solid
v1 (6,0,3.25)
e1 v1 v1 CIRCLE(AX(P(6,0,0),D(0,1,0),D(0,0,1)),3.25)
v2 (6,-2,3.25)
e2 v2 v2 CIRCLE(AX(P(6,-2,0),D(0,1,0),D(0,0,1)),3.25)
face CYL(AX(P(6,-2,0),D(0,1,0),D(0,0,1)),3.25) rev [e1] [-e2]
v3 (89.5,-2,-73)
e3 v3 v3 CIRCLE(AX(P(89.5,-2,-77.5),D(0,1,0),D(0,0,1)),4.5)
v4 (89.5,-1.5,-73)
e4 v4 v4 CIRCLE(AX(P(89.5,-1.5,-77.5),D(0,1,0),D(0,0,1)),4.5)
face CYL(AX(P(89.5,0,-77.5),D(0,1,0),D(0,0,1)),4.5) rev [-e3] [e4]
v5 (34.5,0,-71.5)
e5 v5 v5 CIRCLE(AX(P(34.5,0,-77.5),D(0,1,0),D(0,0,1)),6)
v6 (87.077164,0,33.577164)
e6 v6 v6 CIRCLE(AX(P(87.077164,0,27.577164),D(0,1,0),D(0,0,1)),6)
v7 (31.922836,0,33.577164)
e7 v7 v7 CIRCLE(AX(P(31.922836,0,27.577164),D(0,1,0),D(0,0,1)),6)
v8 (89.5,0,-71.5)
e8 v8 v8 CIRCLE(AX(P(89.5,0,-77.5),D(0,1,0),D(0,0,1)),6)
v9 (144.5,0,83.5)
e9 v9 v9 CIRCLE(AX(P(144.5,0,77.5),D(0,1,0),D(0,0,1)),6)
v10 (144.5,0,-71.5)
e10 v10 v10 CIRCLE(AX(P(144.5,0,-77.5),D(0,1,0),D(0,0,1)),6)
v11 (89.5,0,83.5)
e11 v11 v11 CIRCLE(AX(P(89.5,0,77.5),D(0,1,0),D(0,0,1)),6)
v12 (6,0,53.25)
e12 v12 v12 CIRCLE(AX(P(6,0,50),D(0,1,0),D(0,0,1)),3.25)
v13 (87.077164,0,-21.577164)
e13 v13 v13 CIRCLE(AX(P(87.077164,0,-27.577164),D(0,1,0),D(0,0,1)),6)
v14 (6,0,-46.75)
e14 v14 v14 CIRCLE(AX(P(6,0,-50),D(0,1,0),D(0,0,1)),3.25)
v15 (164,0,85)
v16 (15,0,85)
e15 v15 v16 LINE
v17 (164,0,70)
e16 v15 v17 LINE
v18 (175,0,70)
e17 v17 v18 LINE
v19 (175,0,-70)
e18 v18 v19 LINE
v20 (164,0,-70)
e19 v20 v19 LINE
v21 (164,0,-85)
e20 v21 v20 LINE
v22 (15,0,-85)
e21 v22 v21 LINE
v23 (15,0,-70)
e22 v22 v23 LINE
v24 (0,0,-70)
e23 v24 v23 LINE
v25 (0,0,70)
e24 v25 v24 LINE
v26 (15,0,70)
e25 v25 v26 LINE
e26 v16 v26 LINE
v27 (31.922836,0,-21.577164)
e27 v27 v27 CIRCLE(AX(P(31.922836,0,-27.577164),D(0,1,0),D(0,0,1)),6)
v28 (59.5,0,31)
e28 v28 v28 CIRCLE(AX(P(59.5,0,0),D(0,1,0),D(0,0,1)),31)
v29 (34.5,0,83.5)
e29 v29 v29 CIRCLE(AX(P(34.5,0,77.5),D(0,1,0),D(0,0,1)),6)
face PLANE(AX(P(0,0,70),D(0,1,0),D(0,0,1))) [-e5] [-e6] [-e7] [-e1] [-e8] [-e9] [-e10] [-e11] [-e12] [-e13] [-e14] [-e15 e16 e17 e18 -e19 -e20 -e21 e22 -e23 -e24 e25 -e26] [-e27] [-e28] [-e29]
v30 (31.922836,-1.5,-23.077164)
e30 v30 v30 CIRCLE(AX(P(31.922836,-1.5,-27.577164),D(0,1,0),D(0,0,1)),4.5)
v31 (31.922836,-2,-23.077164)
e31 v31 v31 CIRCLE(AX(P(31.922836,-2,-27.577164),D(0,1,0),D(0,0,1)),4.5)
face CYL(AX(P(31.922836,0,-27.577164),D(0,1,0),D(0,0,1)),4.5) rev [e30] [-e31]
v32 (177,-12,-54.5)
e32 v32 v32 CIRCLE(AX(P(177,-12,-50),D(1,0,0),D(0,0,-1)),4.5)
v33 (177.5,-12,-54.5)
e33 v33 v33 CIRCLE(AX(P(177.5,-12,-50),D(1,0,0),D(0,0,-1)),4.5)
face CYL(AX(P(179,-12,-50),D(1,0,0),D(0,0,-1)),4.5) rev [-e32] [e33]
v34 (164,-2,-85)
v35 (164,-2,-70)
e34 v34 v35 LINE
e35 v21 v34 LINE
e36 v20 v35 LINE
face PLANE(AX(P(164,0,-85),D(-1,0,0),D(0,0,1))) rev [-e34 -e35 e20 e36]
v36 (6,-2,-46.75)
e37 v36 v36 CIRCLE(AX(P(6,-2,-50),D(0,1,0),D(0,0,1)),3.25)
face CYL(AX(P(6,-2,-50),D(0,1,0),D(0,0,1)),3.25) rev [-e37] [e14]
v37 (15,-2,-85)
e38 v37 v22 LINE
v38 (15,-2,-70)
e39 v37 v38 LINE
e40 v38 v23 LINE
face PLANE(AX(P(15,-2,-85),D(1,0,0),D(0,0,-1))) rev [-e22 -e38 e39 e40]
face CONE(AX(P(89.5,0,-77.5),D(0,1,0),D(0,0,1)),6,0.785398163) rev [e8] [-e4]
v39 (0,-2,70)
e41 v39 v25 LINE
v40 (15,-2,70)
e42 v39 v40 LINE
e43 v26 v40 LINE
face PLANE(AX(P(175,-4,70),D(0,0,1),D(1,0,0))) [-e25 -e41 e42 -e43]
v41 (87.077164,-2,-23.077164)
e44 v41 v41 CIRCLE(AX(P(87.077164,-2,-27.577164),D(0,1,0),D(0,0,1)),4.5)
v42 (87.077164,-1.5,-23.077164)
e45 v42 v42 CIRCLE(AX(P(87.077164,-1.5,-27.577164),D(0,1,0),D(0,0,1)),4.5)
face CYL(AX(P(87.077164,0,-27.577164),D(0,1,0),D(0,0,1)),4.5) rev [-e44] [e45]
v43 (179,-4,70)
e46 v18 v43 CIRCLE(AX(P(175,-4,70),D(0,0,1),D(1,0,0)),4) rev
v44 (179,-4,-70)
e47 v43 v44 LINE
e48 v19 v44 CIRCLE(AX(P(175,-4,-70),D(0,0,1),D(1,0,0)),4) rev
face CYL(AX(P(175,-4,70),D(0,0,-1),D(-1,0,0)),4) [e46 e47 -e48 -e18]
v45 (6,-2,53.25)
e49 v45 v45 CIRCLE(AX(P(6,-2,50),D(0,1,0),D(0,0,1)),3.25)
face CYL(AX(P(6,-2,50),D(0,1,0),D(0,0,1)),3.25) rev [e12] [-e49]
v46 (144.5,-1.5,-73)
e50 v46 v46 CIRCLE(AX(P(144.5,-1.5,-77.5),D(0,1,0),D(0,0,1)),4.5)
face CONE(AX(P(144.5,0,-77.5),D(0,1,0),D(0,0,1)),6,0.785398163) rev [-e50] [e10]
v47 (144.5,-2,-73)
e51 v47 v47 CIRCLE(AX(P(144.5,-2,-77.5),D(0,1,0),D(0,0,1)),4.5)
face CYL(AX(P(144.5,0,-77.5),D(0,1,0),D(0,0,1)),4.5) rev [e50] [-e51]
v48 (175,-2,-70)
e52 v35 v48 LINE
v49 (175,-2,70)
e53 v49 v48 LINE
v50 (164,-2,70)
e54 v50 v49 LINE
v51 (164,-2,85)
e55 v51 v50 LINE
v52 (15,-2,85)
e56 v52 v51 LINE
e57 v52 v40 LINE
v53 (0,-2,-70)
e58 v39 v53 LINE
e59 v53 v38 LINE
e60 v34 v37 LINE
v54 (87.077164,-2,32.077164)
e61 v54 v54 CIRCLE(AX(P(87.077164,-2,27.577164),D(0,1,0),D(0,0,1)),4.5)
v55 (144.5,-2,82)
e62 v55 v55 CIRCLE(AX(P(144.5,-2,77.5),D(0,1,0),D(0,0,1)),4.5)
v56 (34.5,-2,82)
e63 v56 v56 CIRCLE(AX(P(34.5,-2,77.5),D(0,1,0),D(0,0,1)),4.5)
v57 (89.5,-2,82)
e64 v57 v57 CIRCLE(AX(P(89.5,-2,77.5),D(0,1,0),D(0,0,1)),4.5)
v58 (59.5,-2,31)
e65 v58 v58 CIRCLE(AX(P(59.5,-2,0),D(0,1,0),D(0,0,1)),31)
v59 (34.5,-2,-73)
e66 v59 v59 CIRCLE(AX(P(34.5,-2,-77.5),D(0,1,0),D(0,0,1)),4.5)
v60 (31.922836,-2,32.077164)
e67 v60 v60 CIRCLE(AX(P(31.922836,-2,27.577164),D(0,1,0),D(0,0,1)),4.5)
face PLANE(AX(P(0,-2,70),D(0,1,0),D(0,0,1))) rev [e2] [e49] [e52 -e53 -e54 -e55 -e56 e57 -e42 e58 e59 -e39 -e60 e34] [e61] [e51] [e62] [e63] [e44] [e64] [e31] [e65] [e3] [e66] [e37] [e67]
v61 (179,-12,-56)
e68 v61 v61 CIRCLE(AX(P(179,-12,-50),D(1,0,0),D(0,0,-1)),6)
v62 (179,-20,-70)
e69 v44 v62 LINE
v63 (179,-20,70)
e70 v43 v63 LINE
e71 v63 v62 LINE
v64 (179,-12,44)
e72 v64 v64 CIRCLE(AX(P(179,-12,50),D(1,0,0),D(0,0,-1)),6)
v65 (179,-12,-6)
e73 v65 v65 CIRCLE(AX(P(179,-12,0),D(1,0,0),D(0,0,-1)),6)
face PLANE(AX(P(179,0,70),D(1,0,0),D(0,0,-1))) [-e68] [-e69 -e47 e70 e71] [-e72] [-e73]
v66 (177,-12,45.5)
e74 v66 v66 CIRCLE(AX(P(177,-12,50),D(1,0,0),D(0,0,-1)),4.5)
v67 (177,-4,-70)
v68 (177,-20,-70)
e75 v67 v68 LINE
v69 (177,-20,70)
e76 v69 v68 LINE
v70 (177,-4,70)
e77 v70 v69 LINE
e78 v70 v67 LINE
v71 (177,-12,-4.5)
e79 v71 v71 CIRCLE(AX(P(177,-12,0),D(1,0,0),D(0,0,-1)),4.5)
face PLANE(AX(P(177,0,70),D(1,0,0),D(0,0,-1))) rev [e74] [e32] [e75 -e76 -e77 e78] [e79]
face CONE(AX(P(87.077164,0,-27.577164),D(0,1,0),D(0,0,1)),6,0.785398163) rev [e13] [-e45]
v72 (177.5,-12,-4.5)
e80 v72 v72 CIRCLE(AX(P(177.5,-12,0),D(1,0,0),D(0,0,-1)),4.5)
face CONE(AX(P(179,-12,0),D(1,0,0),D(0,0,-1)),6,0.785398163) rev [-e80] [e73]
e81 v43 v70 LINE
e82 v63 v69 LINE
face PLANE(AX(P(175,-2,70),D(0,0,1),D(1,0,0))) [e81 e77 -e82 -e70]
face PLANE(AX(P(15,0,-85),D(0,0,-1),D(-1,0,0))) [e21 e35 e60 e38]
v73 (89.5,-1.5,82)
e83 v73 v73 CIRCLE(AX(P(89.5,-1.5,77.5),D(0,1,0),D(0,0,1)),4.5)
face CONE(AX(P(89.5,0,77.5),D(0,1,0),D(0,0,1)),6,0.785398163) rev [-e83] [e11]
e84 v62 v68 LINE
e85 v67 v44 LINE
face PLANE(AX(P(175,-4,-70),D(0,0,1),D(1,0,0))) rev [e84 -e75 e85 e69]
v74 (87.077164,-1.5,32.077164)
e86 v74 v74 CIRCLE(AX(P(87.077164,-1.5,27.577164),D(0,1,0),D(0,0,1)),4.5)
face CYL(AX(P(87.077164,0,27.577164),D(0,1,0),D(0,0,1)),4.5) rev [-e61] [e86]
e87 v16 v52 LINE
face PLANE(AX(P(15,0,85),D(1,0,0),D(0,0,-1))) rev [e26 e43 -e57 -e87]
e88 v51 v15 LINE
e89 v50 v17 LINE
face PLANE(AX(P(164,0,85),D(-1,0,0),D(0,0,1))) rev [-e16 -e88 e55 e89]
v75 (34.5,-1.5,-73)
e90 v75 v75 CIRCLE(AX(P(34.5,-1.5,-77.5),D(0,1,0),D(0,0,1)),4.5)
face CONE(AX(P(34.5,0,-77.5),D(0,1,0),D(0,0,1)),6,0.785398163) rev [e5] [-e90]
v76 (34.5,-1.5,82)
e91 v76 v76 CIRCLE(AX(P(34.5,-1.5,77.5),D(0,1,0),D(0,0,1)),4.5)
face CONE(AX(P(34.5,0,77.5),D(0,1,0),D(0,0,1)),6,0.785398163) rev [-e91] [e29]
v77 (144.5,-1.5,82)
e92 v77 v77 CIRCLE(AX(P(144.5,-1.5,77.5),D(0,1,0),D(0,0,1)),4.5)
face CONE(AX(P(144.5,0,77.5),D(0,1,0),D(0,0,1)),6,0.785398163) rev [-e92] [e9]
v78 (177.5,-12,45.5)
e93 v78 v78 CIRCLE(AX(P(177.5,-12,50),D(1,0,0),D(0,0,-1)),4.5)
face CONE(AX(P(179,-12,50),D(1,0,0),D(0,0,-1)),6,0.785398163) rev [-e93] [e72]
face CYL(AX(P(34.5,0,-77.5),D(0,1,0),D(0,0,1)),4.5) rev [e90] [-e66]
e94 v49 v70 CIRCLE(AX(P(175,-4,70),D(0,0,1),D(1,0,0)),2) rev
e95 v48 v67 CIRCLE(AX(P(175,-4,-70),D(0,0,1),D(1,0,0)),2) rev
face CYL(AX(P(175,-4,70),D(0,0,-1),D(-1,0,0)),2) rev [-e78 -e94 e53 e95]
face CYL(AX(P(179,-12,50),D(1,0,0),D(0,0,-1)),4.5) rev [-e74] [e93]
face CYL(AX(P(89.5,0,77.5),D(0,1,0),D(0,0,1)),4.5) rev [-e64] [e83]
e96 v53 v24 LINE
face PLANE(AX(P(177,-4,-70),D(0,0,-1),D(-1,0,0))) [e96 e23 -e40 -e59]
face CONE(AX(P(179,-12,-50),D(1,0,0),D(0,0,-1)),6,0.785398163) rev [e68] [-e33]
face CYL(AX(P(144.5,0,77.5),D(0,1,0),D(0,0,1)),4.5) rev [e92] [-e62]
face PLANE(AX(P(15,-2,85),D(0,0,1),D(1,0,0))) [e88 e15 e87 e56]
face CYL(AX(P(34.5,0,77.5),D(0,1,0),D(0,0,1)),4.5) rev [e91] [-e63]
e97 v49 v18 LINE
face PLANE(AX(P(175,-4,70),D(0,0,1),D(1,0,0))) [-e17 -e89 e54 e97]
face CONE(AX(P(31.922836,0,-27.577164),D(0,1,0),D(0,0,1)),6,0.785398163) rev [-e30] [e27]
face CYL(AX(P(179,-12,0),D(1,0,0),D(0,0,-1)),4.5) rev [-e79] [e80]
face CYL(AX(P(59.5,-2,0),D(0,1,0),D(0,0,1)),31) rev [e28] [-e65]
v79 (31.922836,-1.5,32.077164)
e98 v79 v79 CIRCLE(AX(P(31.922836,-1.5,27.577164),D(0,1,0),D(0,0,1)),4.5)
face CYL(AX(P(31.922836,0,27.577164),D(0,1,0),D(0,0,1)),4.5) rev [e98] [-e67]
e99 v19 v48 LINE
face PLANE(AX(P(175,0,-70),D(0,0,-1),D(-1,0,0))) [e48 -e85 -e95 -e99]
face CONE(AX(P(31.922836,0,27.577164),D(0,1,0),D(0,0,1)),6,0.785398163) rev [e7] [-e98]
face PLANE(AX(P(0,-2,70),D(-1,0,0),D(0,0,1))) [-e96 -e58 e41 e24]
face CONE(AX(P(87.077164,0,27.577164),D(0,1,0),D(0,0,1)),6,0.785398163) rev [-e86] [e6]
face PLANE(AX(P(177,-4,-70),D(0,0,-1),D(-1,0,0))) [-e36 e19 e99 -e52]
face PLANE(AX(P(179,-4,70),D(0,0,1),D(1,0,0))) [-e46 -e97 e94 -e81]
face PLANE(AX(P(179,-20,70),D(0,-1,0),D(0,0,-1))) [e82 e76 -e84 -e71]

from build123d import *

# Parameters (mm, degrees)
SM_BASE_FLANGE_1_DEPTH = 70
SKETCH_3_R             = 31
SKETCH_3_R_2           = 3.25
CUT_EXTRUDE_1_DEPTH    = 2
SKETCH_4_W             = 149
SKETCH_4_H             = 2
EXTRUDE_2_DEPTH        = 15
SKETCH_5_W             = 149
SKETCH_5_H             = 2
EXTRUDE_3_DEPTH        = 15


# Sheet-metal steps are written as plain solids
with BuildPart() as part:
    # Sketch 1 → Базовая кромка1 (new, symmetric)
    with BuildSketch(Plane.XY):
        with BuildLine():
            Line((0, 0), (175, 0))
            ThreePointArc((175, 0), (177.828427125, -1.171572875), (179, -4))
            Line((179, -4), (179, -20))
            Line((179, -20), (177, -20))
            Line((177, -20), (177, -4))
            ThreePointArc((177, -4), (176.414213562, -2.585786438), (175, -2))
            Line((175, -2), (0, -2))
            Line((0, -2), (0, 0))
        make_face()
    extrude(amount=SM_BASE_FLANGE_1_DEPTH, both=True)

    # Эскиз3 → Вытянуть1 (cut)
    with BuildSketch(Plane(origin=(0, 0, 0), x_dir=(1, 0, 0), z_dir=(0, 1, 0))):
        with Locations(Location((59.5, 0, 0), (0, 0, 270))):
            Circle(SKETCH_3_R)
        with Locations(Location((6, 50, 0), (0, 0, 270))):
            Circle(SKETCH_3_R_2)
        with Locations(Location((6, 0, 0), (0, 0, 270))):
            Circle(SKETCH_3_R_2)
        with Locations(Location((6, -50, 0), (0, 0, 270))):
            Circle(SKETCH_3_R_2)
    extrude(amount=-CUT_EXTRUDE_1_DEPTH, mode=Mode.SUBTRACT)

    # Эскиз4 → Вытянуть2 (add)
    with BuildSketch(Plane.XY.offset(70)):
        with Locations((89.5, -1)):
            Rectangle(SKETCH_4_W, SKETCH_4_H)
    extrude(amount=EXTRUDE_2_DEPTH)

    # Эскиз5 → Вытянуть3 (add)
    with BuildSketch(Plane(origin=(0, 0, -70), x_dir=(-1, 0, 0), z_dir=(0, 0, -1))):
        with Locations((-89.5, -1)):
            Rectangle(SKETCH_5_W, SKETCH_5_H)
    extrude(amount=EXTRUDE_3_DEPTH)

    # Эскиз8 → Зенковка для винта с потайной головкой M61 (revolve, cut)
    with BuildSketch(Plane(origin=(34.5, 0, 77.5), x_dir=(0, 0, 1), z_dir=(1, 0, 0))):
        Polygon((0, 0), (0, 2), (4.5, 2), (4.5, 1.5), (6, 0), align=None)
    revolve(axis=Axis((34.5, 6.35, 77.5), (0, -1, 0)), mode=Mode.SUBTRACT)

    # Эскиз8 at point 2 (carried to point 2, square into its face) → Зенковка для винта с потайной головкой M61 at 2 (revolve, cut)
    with BuildSketch(Plane(origin=(89.5, 0, 77.5), x_dir=(0, 0, 1), z_dir=(1, 0, 0))):
        Polygon((0, 0), (0, 2), (4.5, 2), (4.5, 1.5), (6, 0), align=None)
    revolve(axis=Axis((89.5, 6.35, 77.5), (0, -1, 0)), mode=Mode.SUBTRACT)

    # Эскиз8 at point 3 (carried to point 3, square into its face) → Зенковка для винта с потайной головкой M61 at 3 (revolve, cut)
    with BuildSketch(Plane(origin=(144.5, 0, 77.5), x_dir=(0, 0, 1), z_dir=(1, 0, 0))):
        Polygon((0, 0), (0, 2), (4.5, 2), (4.5, 1.5), (6, 0), align=None)
    revolve(axis=Axis((144.5, 6.35, 77.5), (0, -1, 0)), mode=Mode.SUBTRACT)

    # Эскиз8 at point 4 (carried to point 4, square into its face) → Зенковка для винта с потайной головкой M61 at 4 (revolve, cut)
    with BuildSketch(Plane(origin=(31.922835534, 0, 27.577164466), x_dir=(0, 0, 1), z_dir=(1, 0, 0))):
        Polygon((0, 0), (0, 2), (4.5, 2), (4.5, 1.5), (6, 0), align=None)
    revolve(axis=Axis((31.922835534, 6.35, 27.577164466), (0, -1, 0)), mode=Mode.SUBTRACT)

    # Эскиз8 at point 5 (carried to point 5, square into its face) → Зенковка для винта с потайной головкой M61 at 5 (revolve, cut)
    with BuildSketch(Plane(origin=(87.077164466, 0, 27.577164466), x_dir=(0, 0, 1), z_dir=(1, 0, 0))):
        Polygon((0, 0), (0, 2), (4.5, 2), (4.5, 1.5), (6, 0), align=None)
    revolve(axis=Axis((87.077164466, 6.35, 27.577164466), (0, -1, 0)), mode=Mode.SUBTRACT)

    # Эскиз8 at point 6 (carried to point 6, square into its face) → Зенковка для винта с потайной головкой M61 at 6 (revolve, cut)
    with BuildSketch(Plane(origin=(87.077164466, 0, -27.577164466), x_dir=(0, 0, 1), z_dir=(1, 0, 0))):
        Polygon((0, 0), (0, 2), (4.5, 2), (4.5, 1.5), (6, 0), align=None)
    revolve(axis=Axis((87.077164466, 6.35, -27.577164466), (0, -1, 0)), mode=Mode.SUBTRACT)

    # Эскиз8 at point 7 (carried to point 7, square into its face) → Зенковка для винта с потайной головкой M61 at 7 (revolve, cut)
    with BuildSketch(Plane(origin=(31.922835534, 0, -27.577164466), x_dir=(0, 0, 1), z_dir=(1, 0, 0))):
        Polygon((0, 0), (0, 2), (4.5, 2), (4.5, 1.5), (6, 0), align=None)
    revolve(axis=Axis((31.922835534, 6.35, -27.577164466), (0, -1, 0)), mode=Mode.SUBTRACT)

    # Эскиз8 at point 8 (carried to point 8, square into its face) → Зенковка для винта с потайной головкой M61 at 8 (revolve, cut)
    with BuildSketch(Plane(origin=(34.5, 0, -77.5), x_dir=(0, 0, 1), z_dir=(1, 0, 0))):
        Polygon((0, 0), (0, 2), (4.5, 2), (4.5, 1.5), (6, 0), align=None)
    revolve(axis=Axis((34.5, 6.35, -77.5), (0, -1, 0)), mode=Mode.SUBTRACT)

    # Эскиз8 at point 9 (carried to point 9, square into its face) → Зенковка для винта с потайной головкой M61 at 9 (revolve, cut)
    with BuildSketch(Plane(origin=(89.5, 0, -77.5), x_dir=(0, 0, 1), z_dir=(1, 0, 0))):
        Polygon((0, 0), (0, 2), (4.5, 2), (4.5, 1.5), (6, 0), align=None)
    revolve(axis=Axis((89.5, 6.35, -77.5), (0, -1, 0)), mode=Mode.SUBTRACT)

    # Эскиз8 at point 10 (carried to point 10, square into its face) → Зенковка для винта с потайной головкой M61 at 10 (revolve, cut)
    with BuildSketch(Plane(origin=(144.5, 0, -77.5), x_dir=(0, 0, 1), z_dir=(1, 0, 0))):
        Polygon((0, 0), (0, 2), (4.5, 2), (4.5, 1.5), (6, 0), align=None)
    revolve(axis=Axis((144.5, 6.35, -77.5), (0, -1, 0)), mode=Mode.SUBTRACT)

    # Эскиз8 at point 11 (carried to point 11, square into its face) → Зенковка для винта с потайной головкой M61 at 11 (revolve, cut)
    with BuildSketch(Plane(origin=(179, -12, 50), x_dir=(0, 0, 1), z_dir=(0, -1, 0))):
        Polygon((0, 0), (0, 2), (4.5, 2), (4.5, 1.5), (6, 0), align=None)
    revolve(axis=Axis((185.35, -12, 50), (-1, 0, 0)), mode=Mode.SUBTRACT)

    # Эскиз8 at point 12 (carried to point 12, square into its face) → Зенковка для винта с потайной головкой M61 at 12 (revolve, cut)
    with BuildSketch(Plane(origin=(179, -12, 0), x_dir=(0, 0, 1), z_dir=(0, -1, 0))):
        Polygon((0, 0), (0, 2), (4.5, 2), (4.5, 1.5), (6, 0), align=None)
    revolve(axis=Axis((185.35, -12, 0), (-1, 0, 0)), mode=Mode.SUBTRACT)

    # Эскиз8 at point 13 (carried to point 13, square into its face) → Зенковка для винта с потайной головкой M61 at 13 (revolve, cut)
    with BuildSketch(Plane(origin=(179, -12, -50), x_dir=(0, 0, 1), z_dir=(0, -1, 0))):
        Polygon((0, 0), (0, 2), (4.5, 2), (4.5, 1.5), (6, 0), align=None)
    revolve(axis=Axis((185.35, -12, -50), (-1, 0, 0)), mode=Mode.SUBTRACT)


solid = part.part
